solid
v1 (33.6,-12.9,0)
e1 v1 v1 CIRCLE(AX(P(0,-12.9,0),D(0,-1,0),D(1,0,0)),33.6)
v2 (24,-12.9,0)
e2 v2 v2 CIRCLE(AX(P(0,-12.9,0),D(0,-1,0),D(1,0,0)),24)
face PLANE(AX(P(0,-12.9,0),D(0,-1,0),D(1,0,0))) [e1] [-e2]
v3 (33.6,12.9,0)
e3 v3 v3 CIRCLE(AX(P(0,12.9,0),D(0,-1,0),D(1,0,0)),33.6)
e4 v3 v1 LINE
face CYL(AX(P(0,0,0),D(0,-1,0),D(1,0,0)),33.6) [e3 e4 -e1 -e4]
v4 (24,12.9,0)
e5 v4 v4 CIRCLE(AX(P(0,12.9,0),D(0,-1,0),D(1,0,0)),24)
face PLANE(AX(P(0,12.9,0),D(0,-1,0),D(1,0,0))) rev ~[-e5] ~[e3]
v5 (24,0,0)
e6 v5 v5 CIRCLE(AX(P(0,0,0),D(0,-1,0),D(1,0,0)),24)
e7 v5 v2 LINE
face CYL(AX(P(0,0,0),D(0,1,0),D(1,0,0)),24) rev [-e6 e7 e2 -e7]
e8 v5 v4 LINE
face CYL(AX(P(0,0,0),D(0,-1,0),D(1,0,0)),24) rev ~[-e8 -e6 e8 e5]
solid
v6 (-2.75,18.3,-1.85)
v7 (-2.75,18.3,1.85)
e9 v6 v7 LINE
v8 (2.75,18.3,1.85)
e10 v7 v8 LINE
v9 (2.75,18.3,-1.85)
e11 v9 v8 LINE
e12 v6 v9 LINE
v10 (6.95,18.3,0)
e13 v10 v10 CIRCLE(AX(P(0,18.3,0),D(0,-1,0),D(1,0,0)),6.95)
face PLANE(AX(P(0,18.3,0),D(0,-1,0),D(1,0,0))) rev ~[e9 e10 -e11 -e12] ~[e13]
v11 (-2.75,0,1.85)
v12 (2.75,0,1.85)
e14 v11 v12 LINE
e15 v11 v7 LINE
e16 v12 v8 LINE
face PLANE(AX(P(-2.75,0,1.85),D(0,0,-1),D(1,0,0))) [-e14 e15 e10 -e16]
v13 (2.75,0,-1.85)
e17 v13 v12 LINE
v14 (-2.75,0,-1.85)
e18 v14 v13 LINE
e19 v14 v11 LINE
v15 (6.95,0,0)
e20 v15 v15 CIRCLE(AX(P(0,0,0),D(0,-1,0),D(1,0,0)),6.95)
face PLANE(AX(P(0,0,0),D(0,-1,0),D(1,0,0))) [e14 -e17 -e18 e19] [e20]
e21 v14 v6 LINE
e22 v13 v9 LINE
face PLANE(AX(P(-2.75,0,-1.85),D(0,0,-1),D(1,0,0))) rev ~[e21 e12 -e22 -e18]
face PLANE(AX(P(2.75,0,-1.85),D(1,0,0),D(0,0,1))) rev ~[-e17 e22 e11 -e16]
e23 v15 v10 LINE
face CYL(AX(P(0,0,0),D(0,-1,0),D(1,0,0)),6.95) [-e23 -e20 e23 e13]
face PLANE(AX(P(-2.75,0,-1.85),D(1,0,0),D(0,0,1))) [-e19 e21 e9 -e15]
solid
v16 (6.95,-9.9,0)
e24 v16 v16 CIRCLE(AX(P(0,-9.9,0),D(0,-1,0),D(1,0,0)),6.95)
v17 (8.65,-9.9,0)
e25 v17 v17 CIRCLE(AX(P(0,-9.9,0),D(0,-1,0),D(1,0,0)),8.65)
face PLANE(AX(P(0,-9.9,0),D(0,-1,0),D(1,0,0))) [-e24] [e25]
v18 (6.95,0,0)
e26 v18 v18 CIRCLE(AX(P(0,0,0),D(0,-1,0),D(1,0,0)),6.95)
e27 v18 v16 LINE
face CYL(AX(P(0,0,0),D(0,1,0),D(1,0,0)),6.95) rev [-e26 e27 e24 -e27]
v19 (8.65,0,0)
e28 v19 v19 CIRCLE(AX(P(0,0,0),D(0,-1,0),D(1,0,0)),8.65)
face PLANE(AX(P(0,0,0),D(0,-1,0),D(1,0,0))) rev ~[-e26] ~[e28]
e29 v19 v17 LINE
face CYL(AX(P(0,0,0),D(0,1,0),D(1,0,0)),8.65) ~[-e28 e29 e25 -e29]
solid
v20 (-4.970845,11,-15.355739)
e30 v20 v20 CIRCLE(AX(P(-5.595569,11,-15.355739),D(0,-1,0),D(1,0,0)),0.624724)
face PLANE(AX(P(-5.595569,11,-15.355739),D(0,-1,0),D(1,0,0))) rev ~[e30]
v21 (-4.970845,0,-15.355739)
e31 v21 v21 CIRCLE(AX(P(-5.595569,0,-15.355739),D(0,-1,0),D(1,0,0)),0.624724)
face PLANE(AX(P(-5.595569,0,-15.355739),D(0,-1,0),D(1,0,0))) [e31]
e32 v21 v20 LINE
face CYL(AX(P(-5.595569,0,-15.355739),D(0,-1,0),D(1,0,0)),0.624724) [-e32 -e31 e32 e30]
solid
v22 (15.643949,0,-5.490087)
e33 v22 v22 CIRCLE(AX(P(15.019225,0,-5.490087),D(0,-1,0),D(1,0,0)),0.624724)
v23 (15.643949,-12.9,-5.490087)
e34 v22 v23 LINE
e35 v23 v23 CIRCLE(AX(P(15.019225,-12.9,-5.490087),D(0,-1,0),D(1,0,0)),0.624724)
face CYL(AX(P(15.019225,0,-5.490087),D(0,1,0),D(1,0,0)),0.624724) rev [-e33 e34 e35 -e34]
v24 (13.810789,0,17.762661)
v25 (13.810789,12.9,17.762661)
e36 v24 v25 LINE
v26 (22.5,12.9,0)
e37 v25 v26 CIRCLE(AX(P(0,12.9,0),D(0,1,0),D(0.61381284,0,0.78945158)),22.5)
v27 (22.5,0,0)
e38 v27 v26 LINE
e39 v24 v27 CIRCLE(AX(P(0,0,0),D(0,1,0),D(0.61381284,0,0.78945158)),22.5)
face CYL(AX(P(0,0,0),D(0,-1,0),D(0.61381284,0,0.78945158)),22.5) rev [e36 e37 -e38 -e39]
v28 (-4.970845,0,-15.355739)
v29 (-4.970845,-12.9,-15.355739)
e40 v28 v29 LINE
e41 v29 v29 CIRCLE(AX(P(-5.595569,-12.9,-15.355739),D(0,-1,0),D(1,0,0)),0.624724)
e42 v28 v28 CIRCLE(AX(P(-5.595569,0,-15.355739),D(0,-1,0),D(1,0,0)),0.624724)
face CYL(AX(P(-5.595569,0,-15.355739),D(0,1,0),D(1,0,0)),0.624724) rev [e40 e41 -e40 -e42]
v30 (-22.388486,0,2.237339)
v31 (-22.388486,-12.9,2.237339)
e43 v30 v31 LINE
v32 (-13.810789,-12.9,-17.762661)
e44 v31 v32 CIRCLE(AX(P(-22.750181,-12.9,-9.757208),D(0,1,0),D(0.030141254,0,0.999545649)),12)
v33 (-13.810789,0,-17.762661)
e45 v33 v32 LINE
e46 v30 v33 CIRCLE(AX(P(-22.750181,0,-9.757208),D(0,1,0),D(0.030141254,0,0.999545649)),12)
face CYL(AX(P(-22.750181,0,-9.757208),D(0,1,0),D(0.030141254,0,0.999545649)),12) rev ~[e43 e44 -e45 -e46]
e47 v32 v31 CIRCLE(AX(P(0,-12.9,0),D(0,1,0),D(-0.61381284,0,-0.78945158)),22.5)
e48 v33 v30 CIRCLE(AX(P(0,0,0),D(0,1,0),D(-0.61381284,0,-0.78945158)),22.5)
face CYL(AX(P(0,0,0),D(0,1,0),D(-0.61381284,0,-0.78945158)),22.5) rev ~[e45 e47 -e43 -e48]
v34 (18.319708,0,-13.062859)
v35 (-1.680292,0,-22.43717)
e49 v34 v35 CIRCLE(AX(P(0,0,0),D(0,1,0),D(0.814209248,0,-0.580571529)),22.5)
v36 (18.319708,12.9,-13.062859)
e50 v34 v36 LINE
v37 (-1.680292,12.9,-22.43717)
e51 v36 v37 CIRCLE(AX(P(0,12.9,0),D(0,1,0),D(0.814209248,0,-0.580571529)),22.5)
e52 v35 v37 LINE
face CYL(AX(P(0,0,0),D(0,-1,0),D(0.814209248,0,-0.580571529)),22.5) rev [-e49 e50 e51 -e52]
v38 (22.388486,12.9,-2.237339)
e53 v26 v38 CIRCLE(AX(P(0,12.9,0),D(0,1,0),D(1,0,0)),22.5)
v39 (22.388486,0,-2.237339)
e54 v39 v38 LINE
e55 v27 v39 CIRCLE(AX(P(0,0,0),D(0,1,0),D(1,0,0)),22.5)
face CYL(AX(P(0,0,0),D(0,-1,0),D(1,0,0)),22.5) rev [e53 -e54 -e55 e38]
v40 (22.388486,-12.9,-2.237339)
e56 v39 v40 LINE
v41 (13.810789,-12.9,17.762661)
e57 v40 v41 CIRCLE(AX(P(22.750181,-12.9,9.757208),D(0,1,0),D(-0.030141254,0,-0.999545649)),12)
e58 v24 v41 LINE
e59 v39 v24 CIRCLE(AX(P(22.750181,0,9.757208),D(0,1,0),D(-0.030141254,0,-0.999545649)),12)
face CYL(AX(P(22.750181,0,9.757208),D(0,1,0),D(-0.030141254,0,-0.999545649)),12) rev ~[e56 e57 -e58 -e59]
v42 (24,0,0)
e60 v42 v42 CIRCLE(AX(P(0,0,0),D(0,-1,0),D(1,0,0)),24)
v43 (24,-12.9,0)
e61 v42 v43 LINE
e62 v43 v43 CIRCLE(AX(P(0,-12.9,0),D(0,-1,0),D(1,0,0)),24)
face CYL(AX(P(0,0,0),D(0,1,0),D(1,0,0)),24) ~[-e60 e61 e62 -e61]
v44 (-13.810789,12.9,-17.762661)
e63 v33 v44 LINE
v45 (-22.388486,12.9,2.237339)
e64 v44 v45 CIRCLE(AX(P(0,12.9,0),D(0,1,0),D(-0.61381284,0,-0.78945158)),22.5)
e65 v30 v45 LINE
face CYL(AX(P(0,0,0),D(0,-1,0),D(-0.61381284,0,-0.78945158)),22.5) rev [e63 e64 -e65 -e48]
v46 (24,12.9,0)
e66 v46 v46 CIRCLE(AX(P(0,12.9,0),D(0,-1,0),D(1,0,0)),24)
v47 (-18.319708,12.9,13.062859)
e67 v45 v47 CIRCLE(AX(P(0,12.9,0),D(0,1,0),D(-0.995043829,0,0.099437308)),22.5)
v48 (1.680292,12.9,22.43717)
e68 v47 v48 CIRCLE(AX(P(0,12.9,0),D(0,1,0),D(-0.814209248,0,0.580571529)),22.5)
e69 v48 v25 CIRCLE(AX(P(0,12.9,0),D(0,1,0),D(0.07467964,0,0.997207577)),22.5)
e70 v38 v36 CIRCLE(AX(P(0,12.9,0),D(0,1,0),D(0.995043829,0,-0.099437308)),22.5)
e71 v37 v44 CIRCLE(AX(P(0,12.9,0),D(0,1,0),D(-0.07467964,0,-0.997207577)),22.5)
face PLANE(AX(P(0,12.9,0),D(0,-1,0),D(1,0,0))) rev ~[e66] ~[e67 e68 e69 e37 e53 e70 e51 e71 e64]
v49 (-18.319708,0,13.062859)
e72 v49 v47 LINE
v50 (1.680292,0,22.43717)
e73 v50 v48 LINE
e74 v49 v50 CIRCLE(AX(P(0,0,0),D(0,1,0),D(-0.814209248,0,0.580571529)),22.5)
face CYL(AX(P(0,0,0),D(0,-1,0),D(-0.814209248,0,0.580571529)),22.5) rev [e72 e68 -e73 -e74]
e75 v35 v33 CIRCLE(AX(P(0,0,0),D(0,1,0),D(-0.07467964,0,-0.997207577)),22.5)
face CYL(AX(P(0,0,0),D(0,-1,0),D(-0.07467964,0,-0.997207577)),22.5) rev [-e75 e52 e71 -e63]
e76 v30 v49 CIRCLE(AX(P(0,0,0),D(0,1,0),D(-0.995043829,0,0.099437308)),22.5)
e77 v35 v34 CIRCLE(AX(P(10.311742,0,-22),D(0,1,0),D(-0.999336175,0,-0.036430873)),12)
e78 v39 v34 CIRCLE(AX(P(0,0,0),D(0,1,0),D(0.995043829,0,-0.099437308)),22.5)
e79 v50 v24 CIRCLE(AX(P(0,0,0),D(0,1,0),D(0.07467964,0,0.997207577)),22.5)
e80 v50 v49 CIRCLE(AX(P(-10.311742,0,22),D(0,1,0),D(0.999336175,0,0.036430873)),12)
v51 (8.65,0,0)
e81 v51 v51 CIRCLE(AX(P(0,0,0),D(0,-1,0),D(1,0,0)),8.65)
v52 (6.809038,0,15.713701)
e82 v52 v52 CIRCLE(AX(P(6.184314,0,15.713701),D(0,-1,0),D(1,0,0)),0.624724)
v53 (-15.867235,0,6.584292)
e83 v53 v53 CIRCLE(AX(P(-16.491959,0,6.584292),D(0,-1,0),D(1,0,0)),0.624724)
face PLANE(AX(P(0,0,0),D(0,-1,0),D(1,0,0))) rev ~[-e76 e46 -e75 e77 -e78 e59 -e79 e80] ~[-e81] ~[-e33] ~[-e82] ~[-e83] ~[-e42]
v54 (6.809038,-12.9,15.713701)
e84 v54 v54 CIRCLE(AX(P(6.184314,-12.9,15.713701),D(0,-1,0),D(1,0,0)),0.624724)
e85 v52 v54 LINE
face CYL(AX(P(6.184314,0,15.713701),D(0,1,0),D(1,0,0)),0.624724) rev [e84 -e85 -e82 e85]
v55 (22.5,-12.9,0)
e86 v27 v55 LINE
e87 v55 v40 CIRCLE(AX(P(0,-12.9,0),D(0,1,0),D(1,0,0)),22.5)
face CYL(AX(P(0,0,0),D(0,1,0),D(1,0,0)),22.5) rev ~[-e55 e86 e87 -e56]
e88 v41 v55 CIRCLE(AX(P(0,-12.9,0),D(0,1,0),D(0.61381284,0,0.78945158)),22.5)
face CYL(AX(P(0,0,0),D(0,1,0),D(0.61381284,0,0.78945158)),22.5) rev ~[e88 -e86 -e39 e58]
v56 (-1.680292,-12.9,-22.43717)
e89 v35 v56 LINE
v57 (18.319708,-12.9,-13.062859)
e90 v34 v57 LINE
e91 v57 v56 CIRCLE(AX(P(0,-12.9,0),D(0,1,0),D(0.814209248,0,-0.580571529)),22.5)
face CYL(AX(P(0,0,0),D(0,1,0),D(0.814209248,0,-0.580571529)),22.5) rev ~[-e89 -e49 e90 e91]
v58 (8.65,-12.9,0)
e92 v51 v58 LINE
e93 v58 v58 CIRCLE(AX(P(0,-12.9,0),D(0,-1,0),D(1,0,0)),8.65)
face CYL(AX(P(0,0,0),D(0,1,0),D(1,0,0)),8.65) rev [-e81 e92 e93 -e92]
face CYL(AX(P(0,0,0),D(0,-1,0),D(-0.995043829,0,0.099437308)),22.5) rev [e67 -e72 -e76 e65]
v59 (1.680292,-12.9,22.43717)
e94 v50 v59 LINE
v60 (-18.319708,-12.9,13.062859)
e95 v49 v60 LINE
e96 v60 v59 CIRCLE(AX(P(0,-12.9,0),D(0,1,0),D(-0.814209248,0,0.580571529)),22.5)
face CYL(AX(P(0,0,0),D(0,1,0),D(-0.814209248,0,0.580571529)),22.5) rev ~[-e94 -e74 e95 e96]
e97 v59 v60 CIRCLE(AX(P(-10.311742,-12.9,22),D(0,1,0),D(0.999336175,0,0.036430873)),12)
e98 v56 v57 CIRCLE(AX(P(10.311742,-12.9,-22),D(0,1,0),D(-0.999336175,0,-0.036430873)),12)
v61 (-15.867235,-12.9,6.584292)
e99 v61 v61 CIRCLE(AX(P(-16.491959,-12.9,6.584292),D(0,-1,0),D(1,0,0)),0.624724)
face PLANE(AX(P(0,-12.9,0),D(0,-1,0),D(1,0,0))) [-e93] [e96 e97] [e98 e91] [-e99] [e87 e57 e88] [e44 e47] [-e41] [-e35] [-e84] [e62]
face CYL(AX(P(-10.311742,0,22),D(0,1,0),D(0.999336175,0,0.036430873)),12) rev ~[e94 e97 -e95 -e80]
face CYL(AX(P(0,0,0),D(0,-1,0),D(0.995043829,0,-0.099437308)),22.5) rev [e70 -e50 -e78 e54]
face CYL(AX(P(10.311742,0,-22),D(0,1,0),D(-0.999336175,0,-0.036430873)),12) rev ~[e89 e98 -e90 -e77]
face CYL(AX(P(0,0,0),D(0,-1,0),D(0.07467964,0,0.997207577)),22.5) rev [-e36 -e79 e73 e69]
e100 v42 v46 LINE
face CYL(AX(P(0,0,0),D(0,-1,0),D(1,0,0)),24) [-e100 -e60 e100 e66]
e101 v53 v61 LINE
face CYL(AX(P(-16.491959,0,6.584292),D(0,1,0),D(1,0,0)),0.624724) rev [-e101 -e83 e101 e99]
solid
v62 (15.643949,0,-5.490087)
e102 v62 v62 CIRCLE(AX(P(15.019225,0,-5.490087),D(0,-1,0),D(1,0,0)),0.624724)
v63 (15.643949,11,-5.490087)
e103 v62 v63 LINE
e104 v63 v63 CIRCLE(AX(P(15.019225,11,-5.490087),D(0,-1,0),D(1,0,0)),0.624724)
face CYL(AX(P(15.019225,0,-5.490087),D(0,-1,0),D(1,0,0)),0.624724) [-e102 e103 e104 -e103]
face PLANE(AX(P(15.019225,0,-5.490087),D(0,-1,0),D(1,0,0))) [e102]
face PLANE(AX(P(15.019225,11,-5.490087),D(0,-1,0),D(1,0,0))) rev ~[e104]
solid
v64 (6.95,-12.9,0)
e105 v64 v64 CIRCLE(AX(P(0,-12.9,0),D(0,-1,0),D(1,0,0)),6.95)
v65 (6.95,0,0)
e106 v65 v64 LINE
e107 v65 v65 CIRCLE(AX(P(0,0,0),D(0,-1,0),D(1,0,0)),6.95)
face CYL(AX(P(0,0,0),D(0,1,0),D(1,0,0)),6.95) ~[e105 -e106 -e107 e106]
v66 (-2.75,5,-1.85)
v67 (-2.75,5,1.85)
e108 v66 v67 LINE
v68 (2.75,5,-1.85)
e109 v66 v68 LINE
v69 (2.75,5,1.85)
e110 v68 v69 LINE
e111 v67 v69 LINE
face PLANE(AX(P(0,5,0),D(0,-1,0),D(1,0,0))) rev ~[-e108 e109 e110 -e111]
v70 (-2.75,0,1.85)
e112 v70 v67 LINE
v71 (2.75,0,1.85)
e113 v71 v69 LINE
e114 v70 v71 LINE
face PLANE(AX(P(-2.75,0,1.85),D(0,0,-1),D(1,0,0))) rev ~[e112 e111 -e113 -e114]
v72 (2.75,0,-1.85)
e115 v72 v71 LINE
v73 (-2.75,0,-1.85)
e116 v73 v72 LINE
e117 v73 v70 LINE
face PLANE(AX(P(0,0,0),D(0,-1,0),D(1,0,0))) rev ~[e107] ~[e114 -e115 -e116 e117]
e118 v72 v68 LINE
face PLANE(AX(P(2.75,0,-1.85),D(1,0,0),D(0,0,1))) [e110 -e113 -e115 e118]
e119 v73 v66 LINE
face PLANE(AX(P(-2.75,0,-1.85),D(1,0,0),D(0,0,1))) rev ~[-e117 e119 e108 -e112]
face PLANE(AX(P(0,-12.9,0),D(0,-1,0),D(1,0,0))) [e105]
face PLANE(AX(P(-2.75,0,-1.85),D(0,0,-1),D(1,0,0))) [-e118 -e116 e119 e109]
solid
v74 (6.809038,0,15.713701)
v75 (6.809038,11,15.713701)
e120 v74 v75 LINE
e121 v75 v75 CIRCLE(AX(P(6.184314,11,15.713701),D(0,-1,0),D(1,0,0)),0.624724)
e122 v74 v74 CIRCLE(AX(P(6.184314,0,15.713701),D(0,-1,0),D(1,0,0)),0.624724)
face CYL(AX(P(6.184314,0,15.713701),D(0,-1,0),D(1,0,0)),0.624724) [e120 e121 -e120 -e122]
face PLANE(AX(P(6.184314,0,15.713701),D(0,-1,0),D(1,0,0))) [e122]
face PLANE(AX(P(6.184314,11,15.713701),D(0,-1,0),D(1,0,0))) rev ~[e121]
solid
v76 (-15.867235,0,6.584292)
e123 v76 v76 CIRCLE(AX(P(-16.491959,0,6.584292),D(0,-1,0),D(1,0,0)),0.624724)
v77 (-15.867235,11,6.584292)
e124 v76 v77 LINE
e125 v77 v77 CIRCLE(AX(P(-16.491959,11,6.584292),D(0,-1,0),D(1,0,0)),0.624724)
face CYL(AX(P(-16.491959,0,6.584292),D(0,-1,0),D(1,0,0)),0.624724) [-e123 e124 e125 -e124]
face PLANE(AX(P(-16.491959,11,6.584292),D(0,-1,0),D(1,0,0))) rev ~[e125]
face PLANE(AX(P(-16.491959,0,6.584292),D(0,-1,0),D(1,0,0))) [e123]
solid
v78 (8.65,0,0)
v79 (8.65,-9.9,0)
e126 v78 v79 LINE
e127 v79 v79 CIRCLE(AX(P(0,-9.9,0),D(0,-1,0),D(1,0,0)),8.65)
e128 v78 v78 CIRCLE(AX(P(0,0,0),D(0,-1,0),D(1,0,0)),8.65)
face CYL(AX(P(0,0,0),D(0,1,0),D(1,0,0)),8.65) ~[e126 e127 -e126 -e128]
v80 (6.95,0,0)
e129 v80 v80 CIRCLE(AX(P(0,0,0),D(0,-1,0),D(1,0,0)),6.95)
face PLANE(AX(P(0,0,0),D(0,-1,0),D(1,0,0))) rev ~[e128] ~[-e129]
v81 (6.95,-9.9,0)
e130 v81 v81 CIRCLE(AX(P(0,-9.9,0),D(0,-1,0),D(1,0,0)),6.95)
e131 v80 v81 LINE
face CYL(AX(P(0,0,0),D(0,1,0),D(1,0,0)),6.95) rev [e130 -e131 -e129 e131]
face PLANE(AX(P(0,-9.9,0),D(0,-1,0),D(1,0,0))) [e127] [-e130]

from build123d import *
from build123d import SkipClean  # not in build123d's __all__

# Parameters (mm, degrees)
F0_R      = 24
F0_R_2    = 0.6247236377
F0_R_3    = 8.65
F1_DEPTH  = 12.9
F2_DEPTH  = 12.9
F0_R_4    = 6.95
F0_W      = 5.5
F0_H      = 3.7
F3_DEPTH  = 12.9
F4_DEPTH  = 9.9
F5_DEPTH  = 9.9
F6_DEPTH  = 18.3
F7_DEPTH  = 5
F8_R      = 33.6
F8_R_2    = 24
F9_DEPTH  = 12.9
F10_DEPTH = 12.9
F11_DEPTH = 11


# Not quite as in the source:
# - a feature names something its author has since deleted; it is built from what else it names


with BuildPart() as f1:
    # F0 (on Front) → F1 (new body)
    with BuildSketch(Plane.XZ):
        Circle(F0_R)
        with BuildLine():
            ThreePointArc((13.8107888925, 17.76266056), (20.211293255, 9.887043287), (22.5, 0))
            ThreePointArc((22.5, 0), (22.4721042456, -1.1200583811), (22.3884861532, -2.23733944))
            ThreePointArc((22.3884861532, -2.23733944), (21.0615108713, -7.9159812923), (18.3197080891, -13.0628593934))
            ThreePointArc((18.3197080891, -13.0628593934), (9.5491868643, -20.3730957449), (-1.6802919109, -22.4371704788))
            ThreePointArc((-1.6802919109, -22.4371704788), (-8.0904979364, -20.9950909296), (-13.8107888925, -17.76266056))
            ThreePointArc((-13.8107888925, -17.76266056), (-20.6784157627, -8.8686595122), (-22.3884861532, 2.23733944))
            ThreePointArc((-22.3884861532, 2.23733944), (-21.0615108713, 7.9159812923), (-18.3197080891, 13.0628593934))
            ThreePointArc((-18.3197080891, 13.0628593934), (-9.5491868643, 20.3730957449), (1.6802919109, 22.4371704788))
            ThreePointArc((1.6802919109, 22.4371704788), (8.0904979364, 20.9950909296), (13.8107888925, 17.76266056))
        make_face(mode=Mode.SUBTRACT)
        with BuildLine():
            ThreePointArc((22.3884861532, -2.23733944), (11.7216927981, 5.0272566102), (13.8107888925, 17.76266056))
            ThreePointArc((13.8107888925, 17.76266056), (8.0904979364, 20.9950909296), (1.6802919109, 22.4371704788))
            ThreePointArc((1.6802919109, 22.4371704788), (-5.218842533, 11.134348936), (-18.3197080891, 13.0628593934))
            ThreePointArc((-18.3197080891, 13.0628593934), (-21.0615108713, 7.9159812923), (-22.3884861532, 2.23733944))
            ThreePointArc((-22.3884861532, 2.23733944), (-11.7216927981, -5.0272566102), (-13.8107888925, -17.76266056))
            ThreePointArc((-13.8107888925, -17.76266056), (-8.0904979364, -20.9950909296), (-1.6802919109, -22.4371704788))
            ThreePointArc((-1.6802919109, -22.4371704788), (5.218842533, -11.134348936), (18.3197080891, -13.0628593934))
            ThreePointArc((18.3197080891, -13.0628593934), (21.0615108713, -7.9159812923), (22.3884861532, -2.23733944))
        make_face()
        with Locations((-5.5955685675, -15.3557388112)):
            Circle(F0_R_2, mode=Mode.SUBTRACT)
        with Locations((15.0192249566, -5.4900874384)):
            Circle(F0_R_2, mode=Mode.SUBTRACT)
        with Locations((-16.4919588715, 6.584291812)):
            Circle(F0_R_2, mode=Mode.SUBTRACT)
        Circle(F0_R_3, mode=Mode.SUBTRACT)
        with Locations((6.1843143776, 15.7137010247)):
            Circle(F0_R_2, mode=Mode.SUBTRACT)
    extrude(amount=F1_DEPTH)

    # F0 (on Front) → F2 (join)
    with BuildSketch(Plane.XZ):
        Circle(F0_R)
        with BuildLine():
            ThreePointArc((13.8107888925, 17.76266056), (20.211293255, 9.887043287), (22.5, 0))
            ThreePointArc((22.5, 0), (22.4721042456, -1.1200583811), (22.3884861532, -2.23733944))
            ThreePointArc((22.3884861532, -2.23733944), (21.0615108713, -7.9159812923), (18.3197080891, -13.0628593934))
            ThreePointArc((18.3197080891, -13.0628593934), (9.5491868643, -20.3730957449), (-1.6802919109, -22.4371704788))
            ThreePointArc((-1.6802919109, -22.4371704788), (-8.0904979364, -20.9950909296), (-13.8107888925, -17.76266056))
            ThreePointArc((-13.8107888925, -17.76266056), (-20.6784157627, -8.8686595122), (-22.3884861532, 2.23733944))
            ThreePointArc((-22.3884861532, 2.23733944), (-21.0615108713, 7.9159812923), (-18.3197080891, 13.0628593934))
            ThreePointArc((-18.3197080891, 13.0628593934), (-9.5491868643, 20.3730957449), (1.6802919109, 22.4371704788))
            ThreePointArc((1.6802919109, 22.4371704788), (8.0904979364, 20.9950909296), (13.8107888925, 17.76266056))
        make_face(mode=Mode.SUBTRACT)
    with SkipClean():  # cleaning this boolean's faces spoils the solid; the shape is the same uncleaned
        extrude(amount=-F2_DEPTH)


with BuildPart() as f3:
    # F0 (on Front) → F3 (new body)
    with BuildSketch(Plane.XZ):
        Circle(F0_R_4)
        Rectangle(F0_W, F0_H, mode=Mode.SUBTRACT)
        Rectangle(F0_W, F0_H)
    extrude(amount=F3_DEPTH)

    # F0 (on Front) → F7 (join)
    with BuildSketch(Plane.XZ):
        Rectangle(F0_W, F0_H)
    extrude(amount=-F7_DEPTH)


with BuildPart() as f4:
    # F0 (on Front) → F4 (new body)
    with BuildSketch(Plane.XZ):
        Circle(F0_R_3)
        Circle(F0_R_4, mode=Mode.SUBTRACT)
    extrude(amount=F4_DEPTH)


with BuildPart() as f5:
    # F0 (on Front) → F5 (new body)
    with BuildSketch(Plane.XZ):
        Circle(F0_R_3)
        Circle(F0_R_4, mode=Mode.SUBTRACT)
    extrude(amount=F5_DEPTH)


with BuildPart() as f6:
    # F0 (on Front) → F6 (new body)
    with BuildSketch(Plane.XZ):
        Circle(F0_R_4)
        Rectangle(F0_W, F0_H, mode=Mode.SUBTRACT)
    extrude(amount=-F6_DEPTH)


with BuildPart() as f9:
    # F8 (on Front) → F9 (new body)
    with BuildSketch(Plane.XZ):
        Circle(F8_R)
        Circle(F8_R_2, mode=Mode.SUBTRACT)
    extrude(amount=F9_DEPTH)

    # F10 (add): a face of the model
    f10_faces = [f9.faces().sort_by_distance(p)[0] for p in [
        (-32.6496484861, 0, 0),
    ]]
    extrude(f10_faces, amount=F10_DEPTH)


with BuildPart() as f11:
    # F0 (on Front) → F11 (new body)
    with BuildSketch(Plane.XZ):
        with Locations((6.1843143776, 15.7137010247)):
            Circle(F0_R_2)
    extrude(amount=-F11_DEPTH)


with BuildPart() as f11b:
    # F0 (on Front) → F11, piece 2 (new body)
    with BuildSketch(Plane.XZ):
        with Locations((-16.4919588715, 6.584291812)):
            Circle(F0_R_2)
    extrude(amount=-F11_DEPTH)


with BuildPart() as f11c:
    # F0 (on Front) → F11, piece 3 (new body)
    with BuildSketch(Plane.XZ):
        with Locations((15.0192249566, -5.4900874384)):
            Circle(F0_R_2)
    extrude(amount=-F11_DEPTH)


with BuildPart() as f11d:
    # F0 (on Front) → F11, piece 4 (new body)
    with BuildSketch(Plane.XZ):
        with Locations((-5.5955685675, -15.3557388112)):
            Circle(F0_R_2)
    extrude(amount=-F11_DEPTH)


solid = Compound([f1.part, f3.part, f4.part, f5.part, f6.part, f9.part, f11.part, f11b.part, f11c.part, f11d.part])
